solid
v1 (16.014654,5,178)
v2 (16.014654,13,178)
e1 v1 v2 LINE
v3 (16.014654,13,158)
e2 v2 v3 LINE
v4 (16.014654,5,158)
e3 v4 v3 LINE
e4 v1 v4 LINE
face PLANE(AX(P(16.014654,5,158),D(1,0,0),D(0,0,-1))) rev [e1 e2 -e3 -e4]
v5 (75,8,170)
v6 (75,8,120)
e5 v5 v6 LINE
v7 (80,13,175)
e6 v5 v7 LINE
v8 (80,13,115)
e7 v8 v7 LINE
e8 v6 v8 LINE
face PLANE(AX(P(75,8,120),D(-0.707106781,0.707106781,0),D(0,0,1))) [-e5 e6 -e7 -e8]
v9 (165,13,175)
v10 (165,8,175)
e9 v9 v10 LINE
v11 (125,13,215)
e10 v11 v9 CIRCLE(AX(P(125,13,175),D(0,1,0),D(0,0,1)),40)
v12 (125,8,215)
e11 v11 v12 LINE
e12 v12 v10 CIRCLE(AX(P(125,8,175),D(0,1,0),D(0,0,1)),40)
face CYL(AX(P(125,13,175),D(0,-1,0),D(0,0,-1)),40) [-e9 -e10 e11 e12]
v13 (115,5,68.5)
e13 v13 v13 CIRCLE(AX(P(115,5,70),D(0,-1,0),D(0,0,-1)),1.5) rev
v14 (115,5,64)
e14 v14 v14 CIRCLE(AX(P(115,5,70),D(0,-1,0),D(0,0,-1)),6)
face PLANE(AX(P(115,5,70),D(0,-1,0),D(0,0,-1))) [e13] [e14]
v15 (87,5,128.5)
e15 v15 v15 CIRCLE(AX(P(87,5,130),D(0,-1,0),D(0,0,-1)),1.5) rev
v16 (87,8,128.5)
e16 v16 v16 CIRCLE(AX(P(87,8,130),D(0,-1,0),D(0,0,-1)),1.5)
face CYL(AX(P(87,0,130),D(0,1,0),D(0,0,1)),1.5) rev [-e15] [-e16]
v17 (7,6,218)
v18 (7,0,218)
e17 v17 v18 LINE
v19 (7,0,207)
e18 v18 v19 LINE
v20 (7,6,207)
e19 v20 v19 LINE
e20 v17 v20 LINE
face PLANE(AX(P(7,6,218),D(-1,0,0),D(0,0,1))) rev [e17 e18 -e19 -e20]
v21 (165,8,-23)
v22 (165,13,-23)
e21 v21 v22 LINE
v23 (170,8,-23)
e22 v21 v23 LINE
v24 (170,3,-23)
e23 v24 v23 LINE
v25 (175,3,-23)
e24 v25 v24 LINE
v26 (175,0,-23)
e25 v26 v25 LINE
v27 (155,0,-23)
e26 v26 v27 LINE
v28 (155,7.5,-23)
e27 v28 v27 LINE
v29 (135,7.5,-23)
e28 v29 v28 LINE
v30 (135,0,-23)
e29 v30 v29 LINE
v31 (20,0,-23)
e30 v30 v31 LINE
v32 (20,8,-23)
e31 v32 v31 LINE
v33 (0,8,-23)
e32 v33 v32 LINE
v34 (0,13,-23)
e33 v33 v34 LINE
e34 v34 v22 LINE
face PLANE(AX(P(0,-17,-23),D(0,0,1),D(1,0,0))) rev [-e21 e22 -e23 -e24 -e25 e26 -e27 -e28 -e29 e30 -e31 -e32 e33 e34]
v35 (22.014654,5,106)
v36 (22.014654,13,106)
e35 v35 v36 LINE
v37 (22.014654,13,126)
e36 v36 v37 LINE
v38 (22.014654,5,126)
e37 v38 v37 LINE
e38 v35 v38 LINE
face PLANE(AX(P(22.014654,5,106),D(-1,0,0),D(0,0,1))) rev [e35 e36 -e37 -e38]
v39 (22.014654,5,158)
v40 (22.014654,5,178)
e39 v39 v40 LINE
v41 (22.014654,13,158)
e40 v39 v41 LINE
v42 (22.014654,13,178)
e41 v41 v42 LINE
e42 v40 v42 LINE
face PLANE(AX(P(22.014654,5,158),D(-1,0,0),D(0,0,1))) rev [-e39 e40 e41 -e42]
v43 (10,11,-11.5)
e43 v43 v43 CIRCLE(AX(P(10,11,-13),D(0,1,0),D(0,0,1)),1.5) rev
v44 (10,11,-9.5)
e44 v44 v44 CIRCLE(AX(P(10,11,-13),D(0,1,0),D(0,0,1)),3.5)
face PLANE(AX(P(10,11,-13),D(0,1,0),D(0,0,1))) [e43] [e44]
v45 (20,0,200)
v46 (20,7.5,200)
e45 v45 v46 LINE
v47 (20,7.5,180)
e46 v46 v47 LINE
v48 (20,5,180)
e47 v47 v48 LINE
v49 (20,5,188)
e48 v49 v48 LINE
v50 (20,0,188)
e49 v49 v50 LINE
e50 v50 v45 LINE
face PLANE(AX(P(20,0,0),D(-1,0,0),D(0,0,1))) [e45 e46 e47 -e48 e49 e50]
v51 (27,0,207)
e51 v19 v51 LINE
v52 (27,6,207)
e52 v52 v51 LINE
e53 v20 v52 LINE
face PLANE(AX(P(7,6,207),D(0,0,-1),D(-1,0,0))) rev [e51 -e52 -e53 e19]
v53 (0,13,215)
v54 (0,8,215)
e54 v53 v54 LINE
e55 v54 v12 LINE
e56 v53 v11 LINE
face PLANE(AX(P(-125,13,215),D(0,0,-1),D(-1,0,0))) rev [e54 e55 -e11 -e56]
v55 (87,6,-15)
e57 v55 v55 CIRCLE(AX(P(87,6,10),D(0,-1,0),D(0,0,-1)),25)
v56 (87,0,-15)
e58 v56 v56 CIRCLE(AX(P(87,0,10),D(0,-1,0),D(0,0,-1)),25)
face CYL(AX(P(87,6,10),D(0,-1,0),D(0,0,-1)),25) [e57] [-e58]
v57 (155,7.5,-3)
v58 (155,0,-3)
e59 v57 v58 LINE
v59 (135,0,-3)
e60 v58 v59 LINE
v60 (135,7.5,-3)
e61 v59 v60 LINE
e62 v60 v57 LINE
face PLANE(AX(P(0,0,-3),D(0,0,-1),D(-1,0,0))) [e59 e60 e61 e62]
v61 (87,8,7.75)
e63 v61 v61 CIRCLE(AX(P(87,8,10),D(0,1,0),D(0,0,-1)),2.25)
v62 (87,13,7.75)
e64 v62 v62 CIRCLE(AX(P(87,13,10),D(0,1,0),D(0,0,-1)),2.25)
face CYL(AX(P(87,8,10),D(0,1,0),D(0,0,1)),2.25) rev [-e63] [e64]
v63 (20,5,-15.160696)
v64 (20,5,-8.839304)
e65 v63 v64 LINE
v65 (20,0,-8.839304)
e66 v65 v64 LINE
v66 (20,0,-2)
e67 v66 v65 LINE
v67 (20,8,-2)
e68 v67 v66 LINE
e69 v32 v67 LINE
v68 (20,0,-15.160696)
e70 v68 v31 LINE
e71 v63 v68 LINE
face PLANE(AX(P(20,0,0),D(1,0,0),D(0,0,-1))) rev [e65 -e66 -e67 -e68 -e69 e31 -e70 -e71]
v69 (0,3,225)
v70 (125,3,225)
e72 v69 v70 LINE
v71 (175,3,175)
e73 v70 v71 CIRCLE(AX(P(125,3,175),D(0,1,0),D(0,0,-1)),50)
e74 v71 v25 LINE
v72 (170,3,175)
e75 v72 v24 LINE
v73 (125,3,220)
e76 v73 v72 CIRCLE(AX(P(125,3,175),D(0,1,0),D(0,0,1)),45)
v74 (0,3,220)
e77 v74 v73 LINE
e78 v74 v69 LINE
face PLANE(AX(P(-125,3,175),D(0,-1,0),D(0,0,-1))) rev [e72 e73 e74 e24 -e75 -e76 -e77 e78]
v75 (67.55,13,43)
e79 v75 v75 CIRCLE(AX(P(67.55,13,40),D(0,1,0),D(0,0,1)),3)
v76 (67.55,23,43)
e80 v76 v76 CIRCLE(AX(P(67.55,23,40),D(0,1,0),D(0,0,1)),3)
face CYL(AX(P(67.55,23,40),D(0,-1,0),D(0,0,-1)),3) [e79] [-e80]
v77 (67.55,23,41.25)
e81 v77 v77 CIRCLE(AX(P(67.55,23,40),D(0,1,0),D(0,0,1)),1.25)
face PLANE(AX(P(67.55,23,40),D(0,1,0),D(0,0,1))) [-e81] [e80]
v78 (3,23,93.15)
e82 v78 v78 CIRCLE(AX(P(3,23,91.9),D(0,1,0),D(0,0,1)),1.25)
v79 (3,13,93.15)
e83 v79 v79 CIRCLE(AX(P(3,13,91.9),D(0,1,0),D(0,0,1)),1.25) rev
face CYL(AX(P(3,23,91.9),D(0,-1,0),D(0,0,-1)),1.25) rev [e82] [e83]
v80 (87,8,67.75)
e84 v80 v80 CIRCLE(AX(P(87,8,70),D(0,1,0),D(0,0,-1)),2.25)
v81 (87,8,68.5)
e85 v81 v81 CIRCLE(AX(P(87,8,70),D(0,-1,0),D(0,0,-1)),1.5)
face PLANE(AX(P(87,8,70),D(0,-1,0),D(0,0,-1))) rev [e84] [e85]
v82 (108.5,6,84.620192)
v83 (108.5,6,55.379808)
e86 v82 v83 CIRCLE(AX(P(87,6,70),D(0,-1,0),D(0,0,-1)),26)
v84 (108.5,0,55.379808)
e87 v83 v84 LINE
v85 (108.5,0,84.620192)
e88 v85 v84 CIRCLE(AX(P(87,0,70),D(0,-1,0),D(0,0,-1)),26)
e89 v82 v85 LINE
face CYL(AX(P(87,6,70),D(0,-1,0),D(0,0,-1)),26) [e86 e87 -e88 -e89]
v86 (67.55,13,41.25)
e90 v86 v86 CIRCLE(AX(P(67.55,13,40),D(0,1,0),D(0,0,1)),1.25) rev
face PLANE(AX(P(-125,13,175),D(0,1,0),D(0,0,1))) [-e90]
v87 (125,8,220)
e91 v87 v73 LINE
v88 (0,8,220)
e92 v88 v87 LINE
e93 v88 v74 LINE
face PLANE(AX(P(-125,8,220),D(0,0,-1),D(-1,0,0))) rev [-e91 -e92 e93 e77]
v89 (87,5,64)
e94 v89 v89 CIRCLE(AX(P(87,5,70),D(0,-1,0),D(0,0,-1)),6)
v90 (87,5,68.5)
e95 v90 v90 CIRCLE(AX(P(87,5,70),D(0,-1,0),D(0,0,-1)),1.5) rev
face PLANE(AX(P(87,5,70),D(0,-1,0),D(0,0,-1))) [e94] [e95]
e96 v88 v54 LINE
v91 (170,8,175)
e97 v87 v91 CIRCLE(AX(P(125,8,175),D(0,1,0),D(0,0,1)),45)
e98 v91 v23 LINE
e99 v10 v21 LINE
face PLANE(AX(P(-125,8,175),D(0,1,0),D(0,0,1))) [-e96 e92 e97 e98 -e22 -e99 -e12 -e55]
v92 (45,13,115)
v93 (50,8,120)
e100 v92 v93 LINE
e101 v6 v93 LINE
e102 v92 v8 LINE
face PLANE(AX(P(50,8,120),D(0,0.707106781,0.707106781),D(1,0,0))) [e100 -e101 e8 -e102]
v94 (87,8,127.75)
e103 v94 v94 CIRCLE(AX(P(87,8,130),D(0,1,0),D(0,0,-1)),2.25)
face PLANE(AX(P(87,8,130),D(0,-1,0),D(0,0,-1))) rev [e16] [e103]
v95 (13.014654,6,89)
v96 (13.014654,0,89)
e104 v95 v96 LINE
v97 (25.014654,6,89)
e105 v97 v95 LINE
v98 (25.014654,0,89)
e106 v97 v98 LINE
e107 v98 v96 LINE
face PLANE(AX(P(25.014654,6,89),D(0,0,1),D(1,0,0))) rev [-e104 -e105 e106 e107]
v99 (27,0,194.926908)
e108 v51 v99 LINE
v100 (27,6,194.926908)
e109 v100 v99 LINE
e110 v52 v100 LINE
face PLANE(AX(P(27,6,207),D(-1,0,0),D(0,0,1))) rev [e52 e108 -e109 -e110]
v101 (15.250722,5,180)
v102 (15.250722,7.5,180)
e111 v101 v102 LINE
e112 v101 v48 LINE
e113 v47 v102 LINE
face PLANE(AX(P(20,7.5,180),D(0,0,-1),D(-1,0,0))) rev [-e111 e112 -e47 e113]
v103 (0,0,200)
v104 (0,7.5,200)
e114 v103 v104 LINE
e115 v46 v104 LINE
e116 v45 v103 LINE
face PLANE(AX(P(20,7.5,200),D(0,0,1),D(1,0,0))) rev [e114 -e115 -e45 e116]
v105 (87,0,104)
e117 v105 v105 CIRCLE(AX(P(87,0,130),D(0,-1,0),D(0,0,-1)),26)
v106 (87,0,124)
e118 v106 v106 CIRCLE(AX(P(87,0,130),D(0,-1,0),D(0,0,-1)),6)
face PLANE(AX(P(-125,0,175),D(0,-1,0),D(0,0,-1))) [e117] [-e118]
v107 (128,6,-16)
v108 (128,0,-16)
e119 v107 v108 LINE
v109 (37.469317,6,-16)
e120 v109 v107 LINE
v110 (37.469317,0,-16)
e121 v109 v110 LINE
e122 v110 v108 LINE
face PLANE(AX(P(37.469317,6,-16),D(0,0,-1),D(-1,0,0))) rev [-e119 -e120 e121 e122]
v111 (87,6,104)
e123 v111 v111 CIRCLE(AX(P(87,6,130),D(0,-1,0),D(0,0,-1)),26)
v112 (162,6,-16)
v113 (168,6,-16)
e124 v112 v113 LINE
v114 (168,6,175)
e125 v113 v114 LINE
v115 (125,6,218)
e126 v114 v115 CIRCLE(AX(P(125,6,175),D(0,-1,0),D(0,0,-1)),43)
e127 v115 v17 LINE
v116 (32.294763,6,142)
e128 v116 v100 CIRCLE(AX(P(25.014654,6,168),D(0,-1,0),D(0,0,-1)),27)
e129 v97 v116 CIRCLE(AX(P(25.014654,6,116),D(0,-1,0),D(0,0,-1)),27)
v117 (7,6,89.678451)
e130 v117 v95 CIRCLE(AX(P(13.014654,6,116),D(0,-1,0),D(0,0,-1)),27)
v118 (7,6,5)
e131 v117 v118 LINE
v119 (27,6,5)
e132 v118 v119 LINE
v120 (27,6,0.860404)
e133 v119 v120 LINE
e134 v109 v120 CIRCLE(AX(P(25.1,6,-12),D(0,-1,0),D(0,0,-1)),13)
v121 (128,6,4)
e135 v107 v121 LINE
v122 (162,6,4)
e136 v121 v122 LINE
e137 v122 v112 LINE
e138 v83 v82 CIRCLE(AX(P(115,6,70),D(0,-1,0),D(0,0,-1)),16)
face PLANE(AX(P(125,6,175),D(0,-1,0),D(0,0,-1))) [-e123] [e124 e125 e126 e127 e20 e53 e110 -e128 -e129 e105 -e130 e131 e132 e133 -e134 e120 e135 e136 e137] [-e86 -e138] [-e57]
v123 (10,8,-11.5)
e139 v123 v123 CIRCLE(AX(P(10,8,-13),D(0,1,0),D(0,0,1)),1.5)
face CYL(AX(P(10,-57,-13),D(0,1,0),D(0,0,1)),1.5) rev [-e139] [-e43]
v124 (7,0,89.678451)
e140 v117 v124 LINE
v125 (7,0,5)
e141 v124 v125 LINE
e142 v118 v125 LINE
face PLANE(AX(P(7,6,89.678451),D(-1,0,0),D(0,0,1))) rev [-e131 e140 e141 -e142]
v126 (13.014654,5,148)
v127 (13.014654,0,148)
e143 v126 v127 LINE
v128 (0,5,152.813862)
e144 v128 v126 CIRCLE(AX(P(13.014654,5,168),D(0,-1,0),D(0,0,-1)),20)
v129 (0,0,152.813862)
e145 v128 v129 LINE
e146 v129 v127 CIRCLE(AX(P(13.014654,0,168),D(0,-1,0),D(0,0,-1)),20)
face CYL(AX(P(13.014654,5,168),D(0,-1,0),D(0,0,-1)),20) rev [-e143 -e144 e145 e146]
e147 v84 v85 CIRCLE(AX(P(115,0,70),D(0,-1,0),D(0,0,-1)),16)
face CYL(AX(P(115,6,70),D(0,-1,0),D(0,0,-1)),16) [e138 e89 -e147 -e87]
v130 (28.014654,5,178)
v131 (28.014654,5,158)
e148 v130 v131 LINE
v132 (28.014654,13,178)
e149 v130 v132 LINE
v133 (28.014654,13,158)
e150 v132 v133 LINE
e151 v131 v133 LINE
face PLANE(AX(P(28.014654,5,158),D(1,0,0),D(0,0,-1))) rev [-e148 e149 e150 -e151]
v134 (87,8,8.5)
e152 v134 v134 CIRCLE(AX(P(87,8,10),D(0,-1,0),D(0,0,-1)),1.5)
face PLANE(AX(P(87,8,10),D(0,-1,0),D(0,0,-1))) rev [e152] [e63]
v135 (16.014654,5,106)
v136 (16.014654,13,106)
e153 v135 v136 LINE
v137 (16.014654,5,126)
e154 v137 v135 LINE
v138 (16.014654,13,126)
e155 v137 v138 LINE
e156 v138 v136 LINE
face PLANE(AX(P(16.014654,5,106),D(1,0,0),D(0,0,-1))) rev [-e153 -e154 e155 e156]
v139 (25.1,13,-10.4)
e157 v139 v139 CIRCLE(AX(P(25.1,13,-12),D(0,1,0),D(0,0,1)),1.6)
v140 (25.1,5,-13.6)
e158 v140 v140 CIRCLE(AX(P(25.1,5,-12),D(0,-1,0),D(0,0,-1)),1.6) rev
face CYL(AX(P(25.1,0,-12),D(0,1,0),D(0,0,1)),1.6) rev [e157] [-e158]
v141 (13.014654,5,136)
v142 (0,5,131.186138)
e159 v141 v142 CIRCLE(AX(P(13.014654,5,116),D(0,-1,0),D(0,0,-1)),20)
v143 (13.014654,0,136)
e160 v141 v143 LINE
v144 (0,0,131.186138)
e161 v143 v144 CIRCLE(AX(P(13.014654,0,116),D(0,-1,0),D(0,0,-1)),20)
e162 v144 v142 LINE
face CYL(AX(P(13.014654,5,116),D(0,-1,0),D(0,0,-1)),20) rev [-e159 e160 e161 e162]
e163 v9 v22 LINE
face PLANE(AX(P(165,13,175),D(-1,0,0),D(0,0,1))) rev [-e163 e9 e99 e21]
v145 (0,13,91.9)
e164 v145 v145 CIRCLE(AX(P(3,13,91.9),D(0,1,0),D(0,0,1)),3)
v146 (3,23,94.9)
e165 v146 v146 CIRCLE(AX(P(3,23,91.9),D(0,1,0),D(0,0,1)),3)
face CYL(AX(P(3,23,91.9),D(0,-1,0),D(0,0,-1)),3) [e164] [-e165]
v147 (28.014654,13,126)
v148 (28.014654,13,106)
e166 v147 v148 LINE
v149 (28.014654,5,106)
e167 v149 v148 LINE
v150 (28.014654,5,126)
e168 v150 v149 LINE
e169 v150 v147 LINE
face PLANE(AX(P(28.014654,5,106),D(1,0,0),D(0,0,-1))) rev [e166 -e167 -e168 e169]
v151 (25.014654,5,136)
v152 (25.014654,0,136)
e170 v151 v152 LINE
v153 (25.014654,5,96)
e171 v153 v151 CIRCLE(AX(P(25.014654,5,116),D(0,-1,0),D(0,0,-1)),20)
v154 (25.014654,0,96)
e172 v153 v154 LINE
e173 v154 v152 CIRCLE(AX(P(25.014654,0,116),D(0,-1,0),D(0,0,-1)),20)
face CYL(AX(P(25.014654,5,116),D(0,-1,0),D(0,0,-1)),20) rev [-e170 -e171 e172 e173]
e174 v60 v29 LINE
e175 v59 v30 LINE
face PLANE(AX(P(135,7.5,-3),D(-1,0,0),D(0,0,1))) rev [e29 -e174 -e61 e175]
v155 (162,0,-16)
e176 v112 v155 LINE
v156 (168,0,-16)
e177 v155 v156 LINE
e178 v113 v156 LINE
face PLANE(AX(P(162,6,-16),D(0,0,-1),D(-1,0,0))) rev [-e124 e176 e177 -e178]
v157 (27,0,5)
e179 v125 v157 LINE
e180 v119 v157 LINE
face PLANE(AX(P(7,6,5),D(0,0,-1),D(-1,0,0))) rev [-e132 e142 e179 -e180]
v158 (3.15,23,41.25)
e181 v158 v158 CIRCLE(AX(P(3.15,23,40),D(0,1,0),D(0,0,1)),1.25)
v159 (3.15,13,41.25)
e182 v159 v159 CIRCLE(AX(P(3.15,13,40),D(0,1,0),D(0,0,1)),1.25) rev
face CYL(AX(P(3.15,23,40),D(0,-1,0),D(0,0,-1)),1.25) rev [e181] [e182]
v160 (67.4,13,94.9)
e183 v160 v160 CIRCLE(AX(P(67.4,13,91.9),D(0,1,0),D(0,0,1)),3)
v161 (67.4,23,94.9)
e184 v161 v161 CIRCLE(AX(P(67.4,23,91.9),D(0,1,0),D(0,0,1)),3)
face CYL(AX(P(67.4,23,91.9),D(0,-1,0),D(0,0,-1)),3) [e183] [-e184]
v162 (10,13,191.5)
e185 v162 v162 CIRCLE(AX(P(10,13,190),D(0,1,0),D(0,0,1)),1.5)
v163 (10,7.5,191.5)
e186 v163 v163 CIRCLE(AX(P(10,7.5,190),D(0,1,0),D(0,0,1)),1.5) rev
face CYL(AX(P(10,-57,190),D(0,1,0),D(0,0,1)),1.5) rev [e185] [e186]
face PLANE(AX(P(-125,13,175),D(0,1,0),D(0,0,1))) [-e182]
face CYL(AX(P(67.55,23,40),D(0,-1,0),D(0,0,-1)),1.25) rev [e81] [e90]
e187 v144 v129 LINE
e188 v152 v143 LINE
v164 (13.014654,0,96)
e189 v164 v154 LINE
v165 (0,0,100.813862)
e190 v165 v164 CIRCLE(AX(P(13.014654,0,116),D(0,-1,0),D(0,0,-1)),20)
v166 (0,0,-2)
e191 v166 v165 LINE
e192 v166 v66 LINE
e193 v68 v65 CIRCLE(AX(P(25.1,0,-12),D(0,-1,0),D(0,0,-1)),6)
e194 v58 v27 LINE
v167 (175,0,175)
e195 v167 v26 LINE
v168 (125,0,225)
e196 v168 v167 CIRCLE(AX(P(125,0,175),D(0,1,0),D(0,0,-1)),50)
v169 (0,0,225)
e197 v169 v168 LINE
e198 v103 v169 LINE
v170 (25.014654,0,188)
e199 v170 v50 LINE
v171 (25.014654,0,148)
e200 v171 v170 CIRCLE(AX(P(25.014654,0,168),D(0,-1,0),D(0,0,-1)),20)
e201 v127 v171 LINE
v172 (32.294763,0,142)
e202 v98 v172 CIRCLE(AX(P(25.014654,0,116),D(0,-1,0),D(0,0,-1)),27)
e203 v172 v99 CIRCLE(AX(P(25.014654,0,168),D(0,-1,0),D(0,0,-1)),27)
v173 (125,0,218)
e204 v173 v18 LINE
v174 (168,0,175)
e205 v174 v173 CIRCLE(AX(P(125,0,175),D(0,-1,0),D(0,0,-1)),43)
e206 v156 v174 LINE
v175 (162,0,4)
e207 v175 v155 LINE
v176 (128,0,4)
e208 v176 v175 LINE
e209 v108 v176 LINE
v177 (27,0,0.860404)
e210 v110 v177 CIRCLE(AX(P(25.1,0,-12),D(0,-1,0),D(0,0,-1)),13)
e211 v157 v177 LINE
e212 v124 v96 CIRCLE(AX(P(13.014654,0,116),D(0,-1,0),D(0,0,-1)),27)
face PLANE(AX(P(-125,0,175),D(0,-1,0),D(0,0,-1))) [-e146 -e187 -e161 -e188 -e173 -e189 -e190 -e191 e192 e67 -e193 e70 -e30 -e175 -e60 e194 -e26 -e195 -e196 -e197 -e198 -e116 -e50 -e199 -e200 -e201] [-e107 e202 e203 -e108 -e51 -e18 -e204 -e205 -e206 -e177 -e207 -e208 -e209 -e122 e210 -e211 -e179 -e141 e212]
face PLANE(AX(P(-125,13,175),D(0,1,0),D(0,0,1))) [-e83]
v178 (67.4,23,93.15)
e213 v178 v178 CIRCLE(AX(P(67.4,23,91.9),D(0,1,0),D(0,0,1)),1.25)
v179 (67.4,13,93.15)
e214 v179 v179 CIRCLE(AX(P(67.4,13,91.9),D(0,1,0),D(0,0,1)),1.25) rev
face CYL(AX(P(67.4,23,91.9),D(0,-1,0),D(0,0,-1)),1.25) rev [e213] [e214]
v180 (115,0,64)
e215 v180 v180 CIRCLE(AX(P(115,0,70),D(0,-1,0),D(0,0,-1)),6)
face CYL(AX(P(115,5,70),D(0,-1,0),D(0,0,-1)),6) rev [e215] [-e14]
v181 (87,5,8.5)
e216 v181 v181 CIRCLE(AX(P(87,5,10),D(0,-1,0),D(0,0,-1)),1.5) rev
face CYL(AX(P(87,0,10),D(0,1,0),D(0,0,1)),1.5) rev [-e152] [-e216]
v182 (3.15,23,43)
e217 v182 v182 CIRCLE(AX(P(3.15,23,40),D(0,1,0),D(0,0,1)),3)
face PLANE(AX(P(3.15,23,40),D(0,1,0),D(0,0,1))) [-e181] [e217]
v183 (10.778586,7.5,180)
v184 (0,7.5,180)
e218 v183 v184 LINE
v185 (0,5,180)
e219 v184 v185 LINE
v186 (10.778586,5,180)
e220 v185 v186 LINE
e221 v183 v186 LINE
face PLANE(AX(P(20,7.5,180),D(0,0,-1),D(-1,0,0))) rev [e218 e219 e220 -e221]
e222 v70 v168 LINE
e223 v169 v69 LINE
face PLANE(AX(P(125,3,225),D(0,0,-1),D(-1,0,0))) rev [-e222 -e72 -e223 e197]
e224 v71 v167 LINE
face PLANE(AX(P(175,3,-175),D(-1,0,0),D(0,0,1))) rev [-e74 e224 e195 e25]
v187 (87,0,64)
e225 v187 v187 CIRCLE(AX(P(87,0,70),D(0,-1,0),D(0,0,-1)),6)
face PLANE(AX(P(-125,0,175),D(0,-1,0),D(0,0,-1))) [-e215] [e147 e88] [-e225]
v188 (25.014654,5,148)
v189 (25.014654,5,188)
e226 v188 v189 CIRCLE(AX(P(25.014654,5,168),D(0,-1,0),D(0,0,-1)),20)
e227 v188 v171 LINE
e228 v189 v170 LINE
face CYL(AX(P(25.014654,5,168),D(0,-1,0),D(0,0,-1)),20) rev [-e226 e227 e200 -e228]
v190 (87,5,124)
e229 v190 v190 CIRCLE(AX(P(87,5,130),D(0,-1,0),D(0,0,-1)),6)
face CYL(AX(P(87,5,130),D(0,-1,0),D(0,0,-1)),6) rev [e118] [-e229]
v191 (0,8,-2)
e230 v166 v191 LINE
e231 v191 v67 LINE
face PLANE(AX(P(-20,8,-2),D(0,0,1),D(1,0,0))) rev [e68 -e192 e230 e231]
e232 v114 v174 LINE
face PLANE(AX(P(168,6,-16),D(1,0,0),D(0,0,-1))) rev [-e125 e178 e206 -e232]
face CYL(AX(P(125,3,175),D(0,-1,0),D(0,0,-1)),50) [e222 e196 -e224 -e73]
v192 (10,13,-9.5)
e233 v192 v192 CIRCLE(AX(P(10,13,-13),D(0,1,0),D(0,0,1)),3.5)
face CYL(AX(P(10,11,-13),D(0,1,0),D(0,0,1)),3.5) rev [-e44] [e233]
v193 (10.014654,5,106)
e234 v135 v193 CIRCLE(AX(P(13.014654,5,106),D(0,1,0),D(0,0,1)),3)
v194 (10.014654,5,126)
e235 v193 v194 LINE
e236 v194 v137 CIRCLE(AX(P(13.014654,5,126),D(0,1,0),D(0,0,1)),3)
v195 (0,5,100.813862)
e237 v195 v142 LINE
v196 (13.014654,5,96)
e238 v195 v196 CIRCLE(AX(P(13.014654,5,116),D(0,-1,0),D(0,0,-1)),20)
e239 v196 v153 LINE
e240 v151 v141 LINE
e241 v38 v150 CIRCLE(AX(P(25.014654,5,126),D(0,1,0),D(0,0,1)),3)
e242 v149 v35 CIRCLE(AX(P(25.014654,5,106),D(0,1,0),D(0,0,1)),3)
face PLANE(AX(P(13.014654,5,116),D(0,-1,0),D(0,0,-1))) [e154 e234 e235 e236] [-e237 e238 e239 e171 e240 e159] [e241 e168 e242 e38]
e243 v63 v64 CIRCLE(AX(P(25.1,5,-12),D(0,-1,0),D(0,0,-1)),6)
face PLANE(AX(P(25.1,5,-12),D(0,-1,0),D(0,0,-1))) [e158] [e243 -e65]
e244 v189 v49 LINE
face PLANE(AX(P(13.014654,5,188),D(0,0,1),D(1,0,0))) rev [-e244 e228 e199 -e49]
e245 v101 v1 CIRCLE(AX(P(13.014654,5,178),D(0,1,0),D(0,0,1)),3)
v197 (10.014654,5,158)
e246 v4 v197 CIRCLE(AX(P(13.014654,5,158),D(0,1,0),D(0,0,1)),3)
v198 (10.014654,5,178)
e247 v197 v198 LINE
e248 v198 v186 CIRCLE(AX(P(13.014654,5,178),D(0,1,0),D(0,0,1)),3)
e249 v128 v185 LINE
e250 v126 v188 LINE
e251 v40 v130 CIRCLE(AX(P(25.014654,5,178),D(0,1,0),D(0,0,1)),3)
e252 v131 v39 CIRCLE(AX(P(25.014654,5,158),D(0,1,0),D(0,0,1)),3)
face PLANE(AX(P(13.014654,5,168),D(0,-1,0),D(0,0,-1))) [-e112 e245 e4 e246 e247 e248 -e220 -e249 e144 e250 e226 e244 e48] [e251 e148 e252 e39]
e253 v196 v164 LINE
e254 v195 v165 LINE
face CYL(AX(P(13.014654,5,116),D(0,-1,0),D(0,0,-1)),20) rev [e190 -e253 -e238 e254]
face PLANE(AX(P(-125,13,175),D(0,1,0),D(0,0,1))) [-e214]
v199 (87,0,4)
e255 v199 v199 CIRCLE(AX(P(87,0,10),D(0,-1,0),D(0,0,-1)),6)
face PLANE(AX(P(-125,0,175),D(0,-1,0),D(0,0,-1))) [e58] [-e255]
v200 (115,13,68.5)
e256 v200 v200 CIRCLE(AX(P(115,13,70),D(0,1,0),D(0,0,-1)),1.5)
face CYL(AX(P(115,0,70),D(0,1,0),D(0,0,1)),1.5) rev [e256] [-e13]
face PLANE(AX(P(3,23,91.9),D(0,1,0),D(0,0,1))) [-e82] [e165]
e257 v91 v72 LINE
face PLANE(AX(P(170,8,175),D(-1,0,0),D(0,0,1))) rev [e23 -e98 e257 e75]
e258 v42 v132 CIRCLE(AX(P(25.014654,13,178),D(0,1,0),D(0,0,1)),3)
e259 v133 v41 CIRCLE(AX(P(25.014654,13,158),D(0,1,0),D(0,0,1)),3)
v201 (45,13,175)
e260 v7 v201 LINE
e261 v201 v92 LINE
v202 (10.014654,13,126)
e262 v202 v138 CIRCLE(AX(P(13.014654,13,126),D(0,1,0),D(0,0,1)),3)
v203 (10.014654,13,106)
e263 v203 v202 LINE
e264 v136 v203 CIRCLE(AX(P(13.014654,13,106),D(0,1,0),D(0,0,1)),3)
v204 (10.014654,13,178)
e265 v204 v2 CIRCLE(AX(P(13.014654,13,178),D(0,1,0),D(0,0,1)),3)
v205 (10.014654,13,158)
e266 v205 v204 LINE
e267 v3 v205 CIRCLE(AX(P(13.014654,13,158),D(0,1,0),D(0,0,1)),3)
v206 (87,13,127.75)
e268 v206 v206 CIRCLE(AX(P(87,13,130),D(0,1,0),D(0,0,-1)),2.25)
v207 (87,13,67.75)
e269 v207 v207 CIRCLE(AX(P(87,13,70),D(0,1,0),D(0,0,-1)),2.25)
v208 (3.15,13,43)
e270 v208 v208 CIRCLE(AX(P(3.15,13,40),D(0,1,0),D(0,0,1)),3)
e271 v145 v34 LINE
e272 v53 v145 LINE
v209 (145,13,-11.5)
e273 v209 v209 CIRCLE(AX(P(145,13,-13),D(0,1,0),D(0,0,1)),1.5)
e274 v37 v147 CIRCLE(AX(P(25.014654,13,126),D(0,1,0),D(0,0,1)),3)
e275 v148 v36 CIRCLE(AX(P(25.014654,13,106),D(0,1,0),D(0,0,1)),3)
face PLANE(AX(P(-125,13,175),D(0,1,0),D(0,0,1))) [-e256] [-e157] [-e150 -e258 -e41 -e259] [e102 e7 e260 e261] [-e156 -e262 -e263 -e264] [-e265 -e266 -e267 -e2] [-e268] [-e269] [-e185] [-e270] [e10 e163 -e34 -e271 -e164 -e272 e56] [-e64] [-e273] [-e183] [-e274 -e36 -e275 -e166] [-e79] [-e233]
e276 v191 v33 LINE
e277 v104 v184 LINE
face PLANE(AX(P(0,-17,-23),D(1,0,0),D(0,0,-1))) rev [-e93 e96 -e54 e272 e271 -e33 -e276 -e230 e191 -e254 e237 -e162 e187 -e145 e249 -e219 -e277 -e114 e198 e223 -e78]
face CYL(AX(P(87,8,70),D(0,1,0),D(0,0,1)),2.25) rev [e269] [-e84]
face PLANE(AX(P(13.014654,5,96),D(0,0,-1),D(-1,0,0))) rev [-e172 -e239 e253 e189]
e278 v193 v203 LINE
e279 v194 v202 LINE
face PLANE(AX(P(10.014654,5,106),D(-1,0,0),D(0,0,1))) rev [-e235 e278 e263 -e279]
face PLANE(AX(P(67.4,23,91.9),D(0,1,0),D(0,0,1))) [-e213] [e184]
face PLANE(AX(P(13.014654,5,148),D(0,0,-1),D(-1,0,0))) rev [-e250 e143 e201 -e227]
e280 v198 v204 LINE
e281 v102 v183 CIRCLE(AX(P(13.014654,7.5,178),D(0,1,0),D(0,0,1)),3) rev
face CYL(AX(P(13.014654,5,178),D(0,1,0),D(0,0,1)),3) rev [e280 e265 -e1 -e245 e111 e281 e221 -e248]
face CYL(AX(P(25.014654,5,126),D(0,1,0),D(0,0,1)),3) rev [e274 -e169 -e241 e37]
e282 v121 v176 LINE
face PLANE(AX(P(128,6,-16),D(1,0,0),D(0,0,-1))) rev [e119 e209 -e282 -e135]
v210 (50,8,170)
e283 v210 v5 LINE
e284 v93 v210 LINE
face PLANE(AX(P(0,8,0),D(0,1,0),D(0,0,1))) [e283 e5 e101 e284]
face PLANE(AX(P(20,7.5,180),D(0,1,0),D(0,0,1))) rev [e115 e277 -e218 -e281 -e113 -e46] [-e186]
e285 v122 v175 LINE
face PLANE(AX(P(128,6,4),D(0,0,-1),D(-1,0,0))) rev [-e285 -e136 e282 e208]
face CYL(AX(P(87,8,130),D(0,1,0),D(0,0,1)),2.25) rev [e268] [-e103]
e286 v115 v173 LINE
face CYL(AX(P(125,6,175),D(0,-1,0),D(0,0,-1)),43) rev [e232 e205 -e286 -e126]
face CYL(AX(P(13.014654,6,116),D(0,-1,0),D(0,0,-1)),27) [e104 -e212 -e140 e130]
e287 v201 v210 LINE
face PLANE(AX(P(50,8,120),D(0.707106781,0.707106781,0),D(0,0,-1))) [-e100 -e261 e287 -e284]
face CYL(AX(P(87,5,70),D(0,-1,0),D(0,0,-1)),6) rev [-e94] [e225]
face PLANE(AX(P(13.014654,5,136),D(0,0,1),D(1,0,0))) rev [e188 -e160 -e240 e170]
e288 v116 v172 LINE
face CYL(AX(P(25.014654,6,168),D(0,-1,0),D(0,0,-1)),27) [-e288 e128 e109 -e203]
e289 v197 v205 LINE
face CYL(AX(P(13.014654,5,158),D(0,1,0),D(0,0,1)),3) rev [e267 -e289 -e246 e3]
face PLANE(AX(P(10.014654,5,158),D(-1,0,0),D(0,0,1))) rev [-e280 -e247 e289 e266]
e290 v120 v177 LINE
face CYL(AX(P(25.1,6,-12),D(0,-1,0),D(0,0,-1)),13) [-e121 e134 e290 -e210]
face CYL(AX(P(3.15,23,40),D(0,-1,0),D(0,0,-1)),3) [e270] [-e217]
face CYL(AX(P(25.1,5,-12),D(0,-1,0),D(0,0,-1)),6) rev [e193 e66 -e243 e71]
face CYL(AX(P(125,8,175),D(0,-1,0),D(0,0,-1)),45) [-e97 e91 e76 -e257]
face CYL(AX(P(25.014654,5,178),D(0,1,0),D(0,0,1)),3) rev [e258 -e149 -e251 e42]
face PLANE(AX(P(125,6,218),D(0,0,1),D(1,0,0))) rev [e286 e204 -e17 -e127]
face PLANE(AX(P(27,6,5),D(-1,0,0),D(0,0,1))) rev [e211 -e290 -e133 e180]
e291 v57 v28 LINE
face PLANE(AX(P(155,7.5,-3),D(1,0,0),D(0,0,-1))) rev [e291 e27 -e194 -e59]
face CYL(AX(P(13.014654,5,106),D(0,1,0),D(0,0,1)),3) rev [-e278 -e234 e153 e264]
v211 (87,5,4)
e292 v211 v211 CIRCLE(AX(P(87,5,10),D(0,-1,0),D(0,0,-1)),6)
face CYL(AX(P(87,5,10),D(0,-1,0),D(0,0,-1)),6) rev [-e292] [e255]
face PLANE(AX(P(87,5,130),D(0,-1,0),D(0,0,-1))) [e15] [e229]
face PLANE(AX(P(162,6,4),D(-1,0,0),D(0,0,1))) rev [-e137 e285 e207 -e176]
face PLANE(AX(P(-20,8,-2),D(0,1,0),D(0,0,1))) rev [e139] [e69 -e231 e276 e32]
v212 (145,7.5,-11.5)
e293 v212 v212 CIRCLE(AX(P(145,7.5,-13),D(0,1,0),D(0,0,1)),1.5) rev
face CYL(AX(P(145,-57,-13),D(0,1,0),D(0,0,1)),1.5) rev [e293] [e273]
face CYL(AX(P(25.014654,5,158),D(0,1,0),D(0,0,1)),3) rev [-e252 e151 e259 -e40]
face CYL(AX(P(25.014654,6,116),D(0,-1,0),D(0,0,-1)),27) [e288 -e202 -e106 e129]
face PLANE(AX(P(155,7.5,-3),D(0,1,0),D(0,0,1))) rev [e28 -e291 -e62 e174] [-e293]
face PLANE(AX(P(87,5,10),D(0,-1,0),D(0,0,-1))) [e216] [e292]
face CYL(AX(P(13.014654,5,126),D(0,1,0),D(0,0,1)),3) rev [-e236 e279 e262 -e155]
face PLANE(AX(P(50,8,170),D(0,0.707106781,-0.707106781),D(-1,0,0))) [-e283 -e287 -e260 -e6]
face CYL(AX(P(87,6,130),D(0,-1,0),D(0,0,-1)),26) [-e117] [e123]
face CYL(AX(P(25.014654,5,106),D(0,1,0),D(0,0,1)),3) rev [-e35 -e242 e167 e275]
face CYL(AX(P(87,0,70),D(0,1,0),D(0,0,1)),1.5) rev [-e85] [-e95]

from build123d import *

# Parameters (mm, degrees)
SALIENTE_EXTRUIR1_DEPTH = 3
SALIENTE_EXTRUIR2_DEPTH = 5
SALIENTE_EXTRUIR3_DEPTH = 5
CROQUIS6_R              = 2.25
CORTAR_EXTRUIR3_DEPTH   = 5
CROQUIS7_R              = 1.5
CORTAR_EXTRUIR4_DEPTH   = 286.340147894
CORTAR_EXTRUIR5_DEPTH   = 8
CROQUIS9_R              = 1.5
CORTAR_EXTRUIR6_DEPTH   = 286.340147894
CROQUIS10_W             = 25
CROQUIS10_H             = 50
CORTAR_EXTRUIR7_DEPTH   = 5
CHAFL_N1_SIZE           = 5
CROQUIS13_R             = 3.5
CROQUIS13_R_2           = 2.25
SALIENTE_EXTRUIR4_DEPTH = 25
CROQUIS14_R             = 3
CROQUIS14_R_2           = 1.25
CROQUIS14_R_3           = 1.5
SALIENTE_EXTRUIR5_DEPTH = 10
CROQUIS12_R             = 1.6
CORTAR_EXTRUIR9_DEPTH   = 287.138078556
CROQUIS11_R             = 6
CORTAR_EXTRUIR8_DEPTH   = 5
CROQUIS16_W             = 40
CROQUIS16_H             = 8
CORTAR_EXTRUIR10_DEPTH  = 20
CORTAR_EXTRUIR11_DEPTH  = 30
CROQUIS19_R             = 1.5
CORTAR_EXTRUIR12_DEPTH  = 70
CROQUIS20_W             = 20
CROQUIS20_H             = 7.5
CORTAR_EXTRUIR13_DEPTH  = 20
CROQUIS21_W             = 20
CROQUIS21_H             = 7.5
CORTAR_EXTRUIR14_DEPTH  = 20
CROQUIS22_R             = 26
CROQUIS22_R_2           = 25
CORTAR_EXTRUIR15_DEPTH  = 6
CROQUIS23_R             = 3.5
CORTAR_EXTRUIR16_DEPTH  = 2


with BuildPart() as part:
    # Croquis1 → Saliente-Extruir1 (new body)
    with BuildSketch(Plane(origin=(0, 0, 0), x_dir=(1, 0, 0), z_dir=(0, 1, 0))):
        with BuildLine():
            Line((125, 225), (-125, 225))
            ThreePointArc((-125, 225), (-160.355339059, 210.355339059), (-175, 175))
            Line((-175, 175), (-175, -175))
            ThreePointArc((-175, -175), (-160.355339059, -210.355339059), (-125, -225))
            Line((-125, -225), (125, -225))
            ThreePointArc((125, -225), (160.355339059, -210.355339059), (175, -175))
            Line((175, -175), (175, 175))
            ThreePointArc((175, 175), (160.355339059, 210.355339059), (125, 225))
        make_face()
    extrude(amount=SALIENTE_EXTRUIR1_DEPTH)

    # Croquis2 → Saliente-Extruir2 (add)
    with BuildSketch(Plane(origin=(0, 3, 0), x_dir=(1, 0, 0), z_dir=(0, 1, 0))):
        with BuildLine():
            Line((-125, -220), (125, -220))
            ThreePointArc((125, -220), (156.819805153, -206.819805153), (170, -175))
            Line((170, -175), (170, 175))
            ThreePointArc((170, 175), (156.819805153, 206.819805153), (125, 220))
            Line((125, 220), (-125, 220))
            ThreePointArc((-125, 220), (-156.819805153, 206.819805153), (-170, 175))
            Line((-170, 175), (-170, -175))
            ThreePointArc((-170, -175), (-156.819805153, -206.819805153), (-125, -220))
        make_face()
    extrude(amount=SALIENTE_EXTRUIR2_DEPTH)

    # Croquis3 → Saliente-Extruir3 (add)
    with BuildSketch(Plane(origin=(0, 8, 0), x_dir=(1, 0, 0), z_dir=(0, 1, 0))):
        with BuildLine():
            Line((-125, -215), (125, -215))
            ThreePointArc((125, -215), (153.284271247, -203.284271247), (165, -175))
            Line((165, -175), (165, 175))
            ThreePointArc((165, 175), (153.284271247, 203.284271247), (125, 215))
            Line((125, 215), (-125, 215))
            ThreePointArc((-125, 215), (-153.284271247, 203.284271247), (-165, 175))
            Line((-165, 175), (-165, -175))
            ThreePointArc((-165, -175), (-153.284271247, -203.284271247), (-125, -215))
        make_face()
    extrude(amount=SALIENTE_EXTRUIR3_DEPTH)

    # Croquis6 → Cortar-Extruir3 (cut)
    with BuildSketch(Plane(origin=(0, 13, 0), x_dir=(1, 0, 0), z_dir=(0, 1, 0))):
        with Locations(Location((-87, -130, 0), (0, 0, 270))):
            Circle(CROQUIS6_R)
        with Locations(Location((-87, -70, 0), (0, 0, 270))):
            Circle(CROQUIS6_R)
        with Locations(Location((-87, -10, 0), (0, 0, 270))):
            Circle(CROQUIS6_R)
        with Locations(Location((87, -130, 0), (0, 0, 90))):
            Circle(CROQUIS6_R)
        with Locations(Location((87, -70, 0), (0, 0, 90))):
            Circle(CROQUIS6_R)
        with Locations(Location((87, -10, 0), (0, 0, 90))):
            Circle(CROQUIS6_R)
    extrude(amount=-CORTAR_EXTRUIR3_DEPTH, mode=Mode.SUBTRACT)

    # Croquis7 → Cortar-Extruir4 (cut, through all)
    with BuildSketch(Plane(origin=(0, 13, 0), x_dir=(1, 0, 0), z_dir=(0, 1, 0))):
        with Locations(Location((-115, -70, 0), (0, 0, 270))):
            Circle(CROQUIS7_R)
        with Locations(Location((-115, 130, 0), (0, 0, 270))):
            Circle(CROQUIS7_R)
        with Locations(Location((115, -70, 0), (0, 0, 90))):
            Circle(CROQUIS7_R)
        with Locations(Location((115, 130, 0), (0, 0, 90))):
            Circle(CROQUIS7_R)
    extrude(amount=-CORTAR_EXTRUIR4_DEPTH, mode=Mode.SUBTRACT)

    # Croquis8 → Cortar-Extruir5 (cut)
    with BuildSketch(Plane(origin=(0, 13, 0), x_dir=(1, 0, 0), z_dir=(0, 1, 0))):
        with BuildLine():
            Line((16.014653583, -158), (16.014653583, -178))
            ThreePointArc((16.014653583, -178), (13.014653583, -181), (10.014653583, -178))
            Line((10.014653583, -178), (10.014653583, -158))
            ThreePointArc((10.014653583, -158), (13.014653583, -155), (16.014653583, -158))
        make_face()
        with BuildLine():
            Line((28.014653583, -158), (28.014653583, -178))
            ThreePointArc((28.014653583, -178), (25.014653583, -181), (22.014653583, -178))
            Line((22.014653583, -178), (22.014653583, -158))
            ThreePointArc((22.014653583, -158), (25.014653583, -155), (28.014653583, -158))
        make_face()
        with BuildLine():
            Line((28.014653583, -106), (28.014653583, -126))
            ThreePointArc((28.014653583, -126), (25.014653583, -129), (22.014653583, -126))
            Line((22.014653583, -126), (22.014653583, -106))
            ThreePointArc((22.014653583, -106), (25.014653583, -103), (28.014653583, -106))
        make_face()
        with BuildLine():
            Line((16.014653583, -106), (16.014653583, -126))
            ThreePointArc((16.014653583, -126), (13.014653583, -129), (10.014653583, -126))
            Line((10.014653583, -126), (10.014653583, -106))
            ThreePointArc((10.014653583, -106), (13.014653583, -103), (16.014653583, -106))
        make_face()
    extrude(amount=-CORTAR_EXTRUIR5_DEPTH, mode=Mode.SUBTRACT)

    # Croquis9 → Cortar-Extruir6 (cut, through all)
    with BuildSketch(Plane(origin=(0, 13, 0), x_dir=(1, 0, 0), z_dir=(0, 1, 0))):
        with Locations(Location((13.014653583, -168, 0), (0, 0, 270))):
            Circle(CROQUIS9_R)
        with Locations(Location((25.014653583, -168, 0), (0, 0, 270))):
            Circle(CROQUIS9_R)
        with Locations(Location((13.014653583, -116, 0), (0, 0, 270))):
            Circle(CROQUIS9_R)
        with Locations(Location((25.014653583, -116, 0), (0, 0, 270))):
            Circle(CROQUIS9_R)
        with Locations(Location((-87, -130, 0), (0, 0, 270))):
            Circle(CROQUIS9_R)
        with Locations(Location((-87, -70, 0), (0, 0, 270))):
            Circle(CROQUIS9_R)
        with Locations(Location((-87, -10, 0), (0, 0, 270))):
            Circle(CROQUIS9_R)
        with Locations(Location((87, -10, 0), (0, 0, 270))):
            Circle(CROQUIS9_R)
        with Locations(Location((87, -70, 0), (0, 0, 270))):
            Circle(CROQUIS9_R)
        with Locations(Location((87, -130, 0), (0, 0, 270))):
            Circle(CROQUIS9_R)
    extrude(amount=-CORTAR_EXTRUIR6_DEPTH, mode=Mode.SUBTRACT)

    # Croquis10 → Cortar-Extruir7 (cut)
    with BuildSketch(Plane(origin=(0, 13, 0), x_dir=(1, 0, 0), z_dir=(0, 1, 0))):
        with Locations((62.5, -145)):
            Rectangle(CROQUIS10_W, CROQUIS10_H)
    extrude(amount=-CORTAR_EXTRUIR7_DEPTH, mode=Mode.SUBTRACT)

    # Chaflán1
    chafl_n1_edges = [part.edges().sort_by_distance(p)[0] for p in [
        (62.5, 13, 120),
        (50, 13, 145),
        (62.5, 13, 170),
        (75, 13, 145),
    ]]
    chamfer(chafl_n1_edges, length=CHAFL_N1_SIZE - 0.0001)  # a hair under: the kernel refuses the full size

    # Croquis13 → Saliente-Extruir4 (add)
    # profile 1 of 4: a face of its own
    with BuildSketch(Plane(origin=(0, 13, 0), x_dir=(1, 0, 0), z_dir=(0, 1, 0))):
        with Locations(Location((-20, -50, 0), (0, 0, 270))):
            Circle(CROQUIS13_R)
        with Locations(Location((-20, -50, 0), (0, 0, 270))):
            Circle(CROQUIS13_R_2, mode=Mode.SUBTRACT)
    # profile 2 of 4: a face of its own
    with BuildSketch(Plane(origin=(0, 13, 0), x_dir=(1, 0, 0), z_dir=(0, 1, 0))):
        with Locations(Location((-60, -50, 0), (0, 0, 270))):
            Circle(CROQUIS13_R)
        with Locations(Location((-60, -50, 0), (0, 0, 270))):
            Circle(CROQUIS13_R_2, mode=Mode.SUBTRACT)
    # profile 3 of 4: a face of its own
    with BuildSketch(Plane(origin=(0, 13, 0), x_dir=(1, 0, 0), z_dir=(0, 1, 0))):
        with Locations(Location((-60, -90, 0), (0, 0, 270))):
            Circle(CROQUIS13_R)
        with Locations(Location((-60, -90, 0), (0, 0, 270))):
            Circle(CROQUIS13_R_2, mode=Mode.SUBTRACT)
    # profile 4 of 4: a face of its own
    with BuildSketch(Plane(origin=(0, 13, 0), x_dir=(1, 0, 0), z_dir=(0, 1, 0))):
        with Locations(Location((-20, -90, 0), (0, 0, 270))):
            Circle(CROQUIS13_R)
        with Locations(Location((-20, -90, 0), (0, 0, 270))):
            Circle(CROQUIS13_R_2, mode=Mode.SUBTRACT)
    extrude(amount=SALIENTE_EXTRUIR4_DEPTH)

    # Croquis14 → Saliente-Extruir5 (add)
    # profile 1 of 6: a face of its own
    with BuildSketch(Plane(origin=(0, 13, 0), x_dir=(1, 0, 0), z_dir=(0, 1, 0))):
        with Locations(Location((67.55, -40, 0), (0, 0, 270))):
            Circle(CROQUIS14_R)
        with Locations(Location((67.55, -40, 0), (0, 0, 270))):
            Circle(CROQUIS14_R_2, mode=Mode.SUBTRACT)
    # profile 2 of 6: a face of its own
    with BuildSketch(Plane(origin=(0, 13, 0), x_dir=(1, 0, 0), z_dir=(0, 1, 0))):
        with Locations(Location((3.15, -40, 0), (0, 0, 270))):
            Circle(CROQUIS14_R)
        with Locations(Location((3.15, -40, 0), (0, 0, 270))):
            Circle(CROQUIS14_R_2, mode=Mode.SUBTRACT)
    # profile 3 of 6: a face of its own
    with BuildSketch(Plane(origin=(0, 13, 0), x_dir=(1, 0, 0), z_dir=(0, 1, 0))):
        with Locations(Location((3, -91.9, 0), (0, 0, 270))):
            Circle(CROQUIS14_R)
        with Locations(Location((3, -91.9, 0), (0, 0, 270))):
            Circle(CROQUIS14_R_2, mode=Mode.SUBTRACT)
    # profile 4 of 6: a face of its own
    with BuildSketch(Plane(origin=(0, 13, 0), x_dir=(1, 0, 0), z_dir=(0, 1, 0))):
        with Locations(Location((67.4, -91.9, 0), (0, 0, 270))):
            Circle(CROQUIS14_R)
        with Locations(Location((67.4, -91.9, 0), (0, 0, 270))):
            Circle(CROQUIS14_R_2, mode=Mode.SUBTRACT)
    # profile 5 of 6: a face of its own
    with BuildSketch(Plane(origin=(0, 13, 0), x_dir=(1, 0, 0), z_dir=(0, 1, 0))):
        with Locations(Location((-10, -102.9, 0), (0, 0, 270))):
            Circle(CROQUIS14_R)
        with Locations(Location((-10, -102.9, 0), (0, 0, 270))):
            Circle(CROQUIS14_R_3, mode=Mode.SUBTRACT)
    # profile 6 of 6: a face of its own
    with BuildSketch(Plane(origin=(0, 13, 0), x_dir=(1, 0, 0), z_dir=(0, 1, 0))):
        with Locations(Location((-10, -118.108484849, 0), (0, 0, 270))):
            Circle(CROQUIS14_R)
        with Locations(Location((-10, -118.108484849, 0), (0, 0, 270))):
            Circle(CROQUIS14_R_3, mode=Mode.SUBTRACT)
    extrude(amount=SALIENTE_EXTRUIR5_DEPTH)

    # Croquis12 → Cortar-Extruir9 (cut, through all)
    with BuildSketch(Plane(origin=(0, 13, 0), x_dir=(1, 0, 0), z_dir=(0, 1, 0))):
        with Locations(Location((-25.1, 162.2, 0), (0, 0, 270))):
            Circle(CROQUIS12_R)
        with Locations(Location((25.1, 162.2, 0), (0, 0, 270))):
            Circle(CROQUIS12_R)
        with Locations(Location((-25.1, 12, 0), (0, 0, 270))):
            Circle(CROQUIS12_R)
        with Locations(Location((25.1, 12, 0), (0, 0, 270))):
            Circle(CROQUIS12_R)
    extrude(amount=-CORTAR_EXTRUIR9_DEPTH, mode=Mode.SUBTRACT)

    # Croquis11 → Cortar-Extruir8 (cut)
    with BuildSketch(Plane.XZ):
        with Locations(Location((87, 130, 0), (0, 0, 270))):
            Circle(CROQUIS11_R)
        with Locations(Location((87, 70, 0), (0, 0, 270))):
            Circle(CROQUIS11_R)
        with Locations(Location((87, 10, 0), (0, 0, 270))):
            Circle(CROQUIS11_R)
        with Locations(Location((-87, 10, 0), (0, 0, 270))):
            Circle(CROQUIS11_R)
        with Locations(Location((-87, 70, 0), (0, 0, 270))):
            Circle(CROQUIS11_R)
        with Locations(Location((-87, 130, 0), (0, 0, 270))):
            Circle(CROQUIS11_R)
        with Locations(Location((-115, 70, 0), (0, 0, 270))):
            Circle(CROQUIS11_R)
        with Locations(Location((115, 70, 0), (0, 0, 270))):
            Circle(CROQUIS11_R)
        with Locations(Location((115, -130, 0), (0, 0, 270))):
            Circle(CROQUIS11_R)
        with Locations(Location((-115, -130, 0), (0, 0, 270))):
            Circle(CROQUIS11_R)
        with Locations(Location((-25.1, -162.2, 0), (0, 0, 270))):
            Circle(CROQUIS11_R)
        with Locations(Location((25.1, -162.2, 0), (0, 0, 270))):
            Circle(CROQUIS11_R)
        with Locations(Location((-25.1, -12, 0), (0, 0, 270))):
            Circle(CROQUIS11_R)
        with Locations(Location((25.1, -12, 0), (0, 0, 270))):
            Circle(CROQUIS11_R)
        with BuildLine():
            Line((13.014653583, 188), (25.014653583, 188))
            ThreePointArc((25.014653583, 188), (45.014653583, 168), (25.014653583, 148))
            Line((25.014653583, 148), (13.014653583, 148))
            ThreePointArc((13.014653583, 148), (-6.985346417, 168), (13.014653583, 188))
        make_face()
        with BuildLine():
            Line((13.014653583, 136), (25.014653583, 136))
            ThreePointArc((25.014653583, 136), (45.014653583, 116), (25.014653583, 96))
            Line((25.014653583, 96), (13.014653583, 96))
            ThreePointArc((13.014653583, 96), (-6.985346417, 116), (13.014653583, 136))
        make_face()
    extrude(amount=-CORTAR_EXTRUIR8_DEPTH, mode=Mode.SUBTRACT)

    # Croquis16 → Cortar-Extruir10 (cut, symmetric)
    with BuildSketch(Plane(origin=(0, 0, 0), x_dir=(0, 0, -1), z_dir=(1, 0, 0))):
        with Locations((22, 4)):
            Rectangle(CROQUIS16_W, CROQUIS16_H)
    extrude(amount=CORTAR_EXTRUIR10_DEPTH, both=True, mode=Mode.SUBTRACT)

    # Croquis17 → Cortar-Extruir11 (cut, symmetric)
    with BuildSketch(Plane(origin=(0, 13, 0), x_dir=(1, 0, 0), z_dir=(0, 1, 0))):
        Polygon((0, 23), (0, -225), (-175, -225), (-175, 23), (-175, 225), (175, 225), (175, 23), align=None)
    extrude(amount=CORTAR_EXTRUIR11_DEPTH, both=True, mode=Mode.SUBTRACT)

    # Croquis19 → Cortar-Extruir12 (cut)
    with BuildSketch(Plane(origin=(0, 13, 0), x_dir=(1, 0, 0), z_dir=(0, 1, 0))):
        with Locations(Location((10, 13, 0), (0, 0, 270))):
            Circle(CROQUIS19_R)
        with Locations(Location((10, -190, 0), (0, 0, 270))):
            Circle(CROQUIS19_R)
        with Locations(Location((145, 13, 0), (0, 0, 270))):
            Circle(CROQUIS19_R)
    extrude(amount=-CORTAR_EXTRUIR12_DEPTH, mode=Mode.SUBTRACT)

    # Croquis20 → Cortar-Extruir13 (cut)
    with BuildSketch(Plane.ZY):
        with Locations((190, 3.75)):
            Rectangle(CROQUIS20_W, CROQUIS20_H)
    extrude(amount=-CORTAR_EXTRUIR13_DEPTH, mode=Mode.SUBTRACT)

    # Croquis21 → Cortar-Extruir14 (cut)
    with BuildSketch(Plane(origin=(0, 0, -23), x_dir=(-1, 0, 0), z_dir=(0, 0, -1))):
        with Locations((-145, 3.75)):
            Rectangle(CROQUIS21_W, CROQUIS21_H)
    extrude(amount=-CORTAR_EXTRUIR14_DEPTH, mode=Mode.SUBTRACT)

    # Croquis22 → Cortar-Extruir15 (cut)
    with BuildSketch(Plane.XZ):
        with BuildLine():
            Line((7, 5), (27, 5))
            Line((27, 5), (27, 0.860404348))
            ThreePointArc((27, 0.860404348), (36.144078039, -5.142278784), (37.469316877, -16))
            Line((37.469316877, -16), (128, -16))
            Line((128, -16), (128, 4))
            Line((128, 4), (162, 4))
            Line((162, 4), (162, -16))
            Line((162, -16), (168, -16))
            Line((168, -16), (168, 175))
            ThreePointArc((168, 175), (155.405591591, 205.405591591), (125, 218))
            Line((125, 218), (7, 218))
            Line((7, 218), (7, 207))
            Line((7, 207), (27, 207))
            Line((27, 207), (27, 194.926908467))
            ThreePointArc((27, 194.926908467), (51.880553533, 170.687642068), (32.294763473, 142))
            ThreePointArc((32.294763473, 142), (51.763485333, 112.325765386), (25.014653583, 89))
            Line((25.014653583, 89), (13.014653583, 89))
            ThreePointArc((13.014653583, 89), (9.988255003, 89.17014887), (7, 89.67845099))
            Line((7, 89.67845099), (7, 5))
        make_face()
        with Locations(Location((87, 130, 0), (0, 0, 270))):
            Circle(CROQUIS22_R, mode=Mode.SUBTRACT)
        with Locations(Location((87, 10, 0), (0, 0, 270))):
            Circle(CROQUIS22_R_2, mode=Mode.SUBTRACT)
        with BuildLine():
            ThreePointArc((108.5, 84.620191517), (61, 70), (108.5, 55.379808483))
            ThreePointArc((108.5, 55.379808483), (131, 70), (108.5, 84.620191517))
        make_face(mode=Mode.SUBTRACT)
    extrude(amount=-CORTAR_EXTRUIR15_DEPTH, mode=Mode.SUBTRACT)

    # Croquis23 → Cortar-Extruir16 (cut)
    with BuildSketch(Plane(origin=(0, 13, 0), x_dir=(1, 0, 0), z_dir=(0, 1, 0))):
        with Locations(Location((10, 13, 0), (0, 0, 270))):
            Circle(CROQUIS23_R)
    extrude(amount=-CORTAR_EXTRUIR16_DEPTH, mode=Mode.SUBTRACT)


solid = part.part
